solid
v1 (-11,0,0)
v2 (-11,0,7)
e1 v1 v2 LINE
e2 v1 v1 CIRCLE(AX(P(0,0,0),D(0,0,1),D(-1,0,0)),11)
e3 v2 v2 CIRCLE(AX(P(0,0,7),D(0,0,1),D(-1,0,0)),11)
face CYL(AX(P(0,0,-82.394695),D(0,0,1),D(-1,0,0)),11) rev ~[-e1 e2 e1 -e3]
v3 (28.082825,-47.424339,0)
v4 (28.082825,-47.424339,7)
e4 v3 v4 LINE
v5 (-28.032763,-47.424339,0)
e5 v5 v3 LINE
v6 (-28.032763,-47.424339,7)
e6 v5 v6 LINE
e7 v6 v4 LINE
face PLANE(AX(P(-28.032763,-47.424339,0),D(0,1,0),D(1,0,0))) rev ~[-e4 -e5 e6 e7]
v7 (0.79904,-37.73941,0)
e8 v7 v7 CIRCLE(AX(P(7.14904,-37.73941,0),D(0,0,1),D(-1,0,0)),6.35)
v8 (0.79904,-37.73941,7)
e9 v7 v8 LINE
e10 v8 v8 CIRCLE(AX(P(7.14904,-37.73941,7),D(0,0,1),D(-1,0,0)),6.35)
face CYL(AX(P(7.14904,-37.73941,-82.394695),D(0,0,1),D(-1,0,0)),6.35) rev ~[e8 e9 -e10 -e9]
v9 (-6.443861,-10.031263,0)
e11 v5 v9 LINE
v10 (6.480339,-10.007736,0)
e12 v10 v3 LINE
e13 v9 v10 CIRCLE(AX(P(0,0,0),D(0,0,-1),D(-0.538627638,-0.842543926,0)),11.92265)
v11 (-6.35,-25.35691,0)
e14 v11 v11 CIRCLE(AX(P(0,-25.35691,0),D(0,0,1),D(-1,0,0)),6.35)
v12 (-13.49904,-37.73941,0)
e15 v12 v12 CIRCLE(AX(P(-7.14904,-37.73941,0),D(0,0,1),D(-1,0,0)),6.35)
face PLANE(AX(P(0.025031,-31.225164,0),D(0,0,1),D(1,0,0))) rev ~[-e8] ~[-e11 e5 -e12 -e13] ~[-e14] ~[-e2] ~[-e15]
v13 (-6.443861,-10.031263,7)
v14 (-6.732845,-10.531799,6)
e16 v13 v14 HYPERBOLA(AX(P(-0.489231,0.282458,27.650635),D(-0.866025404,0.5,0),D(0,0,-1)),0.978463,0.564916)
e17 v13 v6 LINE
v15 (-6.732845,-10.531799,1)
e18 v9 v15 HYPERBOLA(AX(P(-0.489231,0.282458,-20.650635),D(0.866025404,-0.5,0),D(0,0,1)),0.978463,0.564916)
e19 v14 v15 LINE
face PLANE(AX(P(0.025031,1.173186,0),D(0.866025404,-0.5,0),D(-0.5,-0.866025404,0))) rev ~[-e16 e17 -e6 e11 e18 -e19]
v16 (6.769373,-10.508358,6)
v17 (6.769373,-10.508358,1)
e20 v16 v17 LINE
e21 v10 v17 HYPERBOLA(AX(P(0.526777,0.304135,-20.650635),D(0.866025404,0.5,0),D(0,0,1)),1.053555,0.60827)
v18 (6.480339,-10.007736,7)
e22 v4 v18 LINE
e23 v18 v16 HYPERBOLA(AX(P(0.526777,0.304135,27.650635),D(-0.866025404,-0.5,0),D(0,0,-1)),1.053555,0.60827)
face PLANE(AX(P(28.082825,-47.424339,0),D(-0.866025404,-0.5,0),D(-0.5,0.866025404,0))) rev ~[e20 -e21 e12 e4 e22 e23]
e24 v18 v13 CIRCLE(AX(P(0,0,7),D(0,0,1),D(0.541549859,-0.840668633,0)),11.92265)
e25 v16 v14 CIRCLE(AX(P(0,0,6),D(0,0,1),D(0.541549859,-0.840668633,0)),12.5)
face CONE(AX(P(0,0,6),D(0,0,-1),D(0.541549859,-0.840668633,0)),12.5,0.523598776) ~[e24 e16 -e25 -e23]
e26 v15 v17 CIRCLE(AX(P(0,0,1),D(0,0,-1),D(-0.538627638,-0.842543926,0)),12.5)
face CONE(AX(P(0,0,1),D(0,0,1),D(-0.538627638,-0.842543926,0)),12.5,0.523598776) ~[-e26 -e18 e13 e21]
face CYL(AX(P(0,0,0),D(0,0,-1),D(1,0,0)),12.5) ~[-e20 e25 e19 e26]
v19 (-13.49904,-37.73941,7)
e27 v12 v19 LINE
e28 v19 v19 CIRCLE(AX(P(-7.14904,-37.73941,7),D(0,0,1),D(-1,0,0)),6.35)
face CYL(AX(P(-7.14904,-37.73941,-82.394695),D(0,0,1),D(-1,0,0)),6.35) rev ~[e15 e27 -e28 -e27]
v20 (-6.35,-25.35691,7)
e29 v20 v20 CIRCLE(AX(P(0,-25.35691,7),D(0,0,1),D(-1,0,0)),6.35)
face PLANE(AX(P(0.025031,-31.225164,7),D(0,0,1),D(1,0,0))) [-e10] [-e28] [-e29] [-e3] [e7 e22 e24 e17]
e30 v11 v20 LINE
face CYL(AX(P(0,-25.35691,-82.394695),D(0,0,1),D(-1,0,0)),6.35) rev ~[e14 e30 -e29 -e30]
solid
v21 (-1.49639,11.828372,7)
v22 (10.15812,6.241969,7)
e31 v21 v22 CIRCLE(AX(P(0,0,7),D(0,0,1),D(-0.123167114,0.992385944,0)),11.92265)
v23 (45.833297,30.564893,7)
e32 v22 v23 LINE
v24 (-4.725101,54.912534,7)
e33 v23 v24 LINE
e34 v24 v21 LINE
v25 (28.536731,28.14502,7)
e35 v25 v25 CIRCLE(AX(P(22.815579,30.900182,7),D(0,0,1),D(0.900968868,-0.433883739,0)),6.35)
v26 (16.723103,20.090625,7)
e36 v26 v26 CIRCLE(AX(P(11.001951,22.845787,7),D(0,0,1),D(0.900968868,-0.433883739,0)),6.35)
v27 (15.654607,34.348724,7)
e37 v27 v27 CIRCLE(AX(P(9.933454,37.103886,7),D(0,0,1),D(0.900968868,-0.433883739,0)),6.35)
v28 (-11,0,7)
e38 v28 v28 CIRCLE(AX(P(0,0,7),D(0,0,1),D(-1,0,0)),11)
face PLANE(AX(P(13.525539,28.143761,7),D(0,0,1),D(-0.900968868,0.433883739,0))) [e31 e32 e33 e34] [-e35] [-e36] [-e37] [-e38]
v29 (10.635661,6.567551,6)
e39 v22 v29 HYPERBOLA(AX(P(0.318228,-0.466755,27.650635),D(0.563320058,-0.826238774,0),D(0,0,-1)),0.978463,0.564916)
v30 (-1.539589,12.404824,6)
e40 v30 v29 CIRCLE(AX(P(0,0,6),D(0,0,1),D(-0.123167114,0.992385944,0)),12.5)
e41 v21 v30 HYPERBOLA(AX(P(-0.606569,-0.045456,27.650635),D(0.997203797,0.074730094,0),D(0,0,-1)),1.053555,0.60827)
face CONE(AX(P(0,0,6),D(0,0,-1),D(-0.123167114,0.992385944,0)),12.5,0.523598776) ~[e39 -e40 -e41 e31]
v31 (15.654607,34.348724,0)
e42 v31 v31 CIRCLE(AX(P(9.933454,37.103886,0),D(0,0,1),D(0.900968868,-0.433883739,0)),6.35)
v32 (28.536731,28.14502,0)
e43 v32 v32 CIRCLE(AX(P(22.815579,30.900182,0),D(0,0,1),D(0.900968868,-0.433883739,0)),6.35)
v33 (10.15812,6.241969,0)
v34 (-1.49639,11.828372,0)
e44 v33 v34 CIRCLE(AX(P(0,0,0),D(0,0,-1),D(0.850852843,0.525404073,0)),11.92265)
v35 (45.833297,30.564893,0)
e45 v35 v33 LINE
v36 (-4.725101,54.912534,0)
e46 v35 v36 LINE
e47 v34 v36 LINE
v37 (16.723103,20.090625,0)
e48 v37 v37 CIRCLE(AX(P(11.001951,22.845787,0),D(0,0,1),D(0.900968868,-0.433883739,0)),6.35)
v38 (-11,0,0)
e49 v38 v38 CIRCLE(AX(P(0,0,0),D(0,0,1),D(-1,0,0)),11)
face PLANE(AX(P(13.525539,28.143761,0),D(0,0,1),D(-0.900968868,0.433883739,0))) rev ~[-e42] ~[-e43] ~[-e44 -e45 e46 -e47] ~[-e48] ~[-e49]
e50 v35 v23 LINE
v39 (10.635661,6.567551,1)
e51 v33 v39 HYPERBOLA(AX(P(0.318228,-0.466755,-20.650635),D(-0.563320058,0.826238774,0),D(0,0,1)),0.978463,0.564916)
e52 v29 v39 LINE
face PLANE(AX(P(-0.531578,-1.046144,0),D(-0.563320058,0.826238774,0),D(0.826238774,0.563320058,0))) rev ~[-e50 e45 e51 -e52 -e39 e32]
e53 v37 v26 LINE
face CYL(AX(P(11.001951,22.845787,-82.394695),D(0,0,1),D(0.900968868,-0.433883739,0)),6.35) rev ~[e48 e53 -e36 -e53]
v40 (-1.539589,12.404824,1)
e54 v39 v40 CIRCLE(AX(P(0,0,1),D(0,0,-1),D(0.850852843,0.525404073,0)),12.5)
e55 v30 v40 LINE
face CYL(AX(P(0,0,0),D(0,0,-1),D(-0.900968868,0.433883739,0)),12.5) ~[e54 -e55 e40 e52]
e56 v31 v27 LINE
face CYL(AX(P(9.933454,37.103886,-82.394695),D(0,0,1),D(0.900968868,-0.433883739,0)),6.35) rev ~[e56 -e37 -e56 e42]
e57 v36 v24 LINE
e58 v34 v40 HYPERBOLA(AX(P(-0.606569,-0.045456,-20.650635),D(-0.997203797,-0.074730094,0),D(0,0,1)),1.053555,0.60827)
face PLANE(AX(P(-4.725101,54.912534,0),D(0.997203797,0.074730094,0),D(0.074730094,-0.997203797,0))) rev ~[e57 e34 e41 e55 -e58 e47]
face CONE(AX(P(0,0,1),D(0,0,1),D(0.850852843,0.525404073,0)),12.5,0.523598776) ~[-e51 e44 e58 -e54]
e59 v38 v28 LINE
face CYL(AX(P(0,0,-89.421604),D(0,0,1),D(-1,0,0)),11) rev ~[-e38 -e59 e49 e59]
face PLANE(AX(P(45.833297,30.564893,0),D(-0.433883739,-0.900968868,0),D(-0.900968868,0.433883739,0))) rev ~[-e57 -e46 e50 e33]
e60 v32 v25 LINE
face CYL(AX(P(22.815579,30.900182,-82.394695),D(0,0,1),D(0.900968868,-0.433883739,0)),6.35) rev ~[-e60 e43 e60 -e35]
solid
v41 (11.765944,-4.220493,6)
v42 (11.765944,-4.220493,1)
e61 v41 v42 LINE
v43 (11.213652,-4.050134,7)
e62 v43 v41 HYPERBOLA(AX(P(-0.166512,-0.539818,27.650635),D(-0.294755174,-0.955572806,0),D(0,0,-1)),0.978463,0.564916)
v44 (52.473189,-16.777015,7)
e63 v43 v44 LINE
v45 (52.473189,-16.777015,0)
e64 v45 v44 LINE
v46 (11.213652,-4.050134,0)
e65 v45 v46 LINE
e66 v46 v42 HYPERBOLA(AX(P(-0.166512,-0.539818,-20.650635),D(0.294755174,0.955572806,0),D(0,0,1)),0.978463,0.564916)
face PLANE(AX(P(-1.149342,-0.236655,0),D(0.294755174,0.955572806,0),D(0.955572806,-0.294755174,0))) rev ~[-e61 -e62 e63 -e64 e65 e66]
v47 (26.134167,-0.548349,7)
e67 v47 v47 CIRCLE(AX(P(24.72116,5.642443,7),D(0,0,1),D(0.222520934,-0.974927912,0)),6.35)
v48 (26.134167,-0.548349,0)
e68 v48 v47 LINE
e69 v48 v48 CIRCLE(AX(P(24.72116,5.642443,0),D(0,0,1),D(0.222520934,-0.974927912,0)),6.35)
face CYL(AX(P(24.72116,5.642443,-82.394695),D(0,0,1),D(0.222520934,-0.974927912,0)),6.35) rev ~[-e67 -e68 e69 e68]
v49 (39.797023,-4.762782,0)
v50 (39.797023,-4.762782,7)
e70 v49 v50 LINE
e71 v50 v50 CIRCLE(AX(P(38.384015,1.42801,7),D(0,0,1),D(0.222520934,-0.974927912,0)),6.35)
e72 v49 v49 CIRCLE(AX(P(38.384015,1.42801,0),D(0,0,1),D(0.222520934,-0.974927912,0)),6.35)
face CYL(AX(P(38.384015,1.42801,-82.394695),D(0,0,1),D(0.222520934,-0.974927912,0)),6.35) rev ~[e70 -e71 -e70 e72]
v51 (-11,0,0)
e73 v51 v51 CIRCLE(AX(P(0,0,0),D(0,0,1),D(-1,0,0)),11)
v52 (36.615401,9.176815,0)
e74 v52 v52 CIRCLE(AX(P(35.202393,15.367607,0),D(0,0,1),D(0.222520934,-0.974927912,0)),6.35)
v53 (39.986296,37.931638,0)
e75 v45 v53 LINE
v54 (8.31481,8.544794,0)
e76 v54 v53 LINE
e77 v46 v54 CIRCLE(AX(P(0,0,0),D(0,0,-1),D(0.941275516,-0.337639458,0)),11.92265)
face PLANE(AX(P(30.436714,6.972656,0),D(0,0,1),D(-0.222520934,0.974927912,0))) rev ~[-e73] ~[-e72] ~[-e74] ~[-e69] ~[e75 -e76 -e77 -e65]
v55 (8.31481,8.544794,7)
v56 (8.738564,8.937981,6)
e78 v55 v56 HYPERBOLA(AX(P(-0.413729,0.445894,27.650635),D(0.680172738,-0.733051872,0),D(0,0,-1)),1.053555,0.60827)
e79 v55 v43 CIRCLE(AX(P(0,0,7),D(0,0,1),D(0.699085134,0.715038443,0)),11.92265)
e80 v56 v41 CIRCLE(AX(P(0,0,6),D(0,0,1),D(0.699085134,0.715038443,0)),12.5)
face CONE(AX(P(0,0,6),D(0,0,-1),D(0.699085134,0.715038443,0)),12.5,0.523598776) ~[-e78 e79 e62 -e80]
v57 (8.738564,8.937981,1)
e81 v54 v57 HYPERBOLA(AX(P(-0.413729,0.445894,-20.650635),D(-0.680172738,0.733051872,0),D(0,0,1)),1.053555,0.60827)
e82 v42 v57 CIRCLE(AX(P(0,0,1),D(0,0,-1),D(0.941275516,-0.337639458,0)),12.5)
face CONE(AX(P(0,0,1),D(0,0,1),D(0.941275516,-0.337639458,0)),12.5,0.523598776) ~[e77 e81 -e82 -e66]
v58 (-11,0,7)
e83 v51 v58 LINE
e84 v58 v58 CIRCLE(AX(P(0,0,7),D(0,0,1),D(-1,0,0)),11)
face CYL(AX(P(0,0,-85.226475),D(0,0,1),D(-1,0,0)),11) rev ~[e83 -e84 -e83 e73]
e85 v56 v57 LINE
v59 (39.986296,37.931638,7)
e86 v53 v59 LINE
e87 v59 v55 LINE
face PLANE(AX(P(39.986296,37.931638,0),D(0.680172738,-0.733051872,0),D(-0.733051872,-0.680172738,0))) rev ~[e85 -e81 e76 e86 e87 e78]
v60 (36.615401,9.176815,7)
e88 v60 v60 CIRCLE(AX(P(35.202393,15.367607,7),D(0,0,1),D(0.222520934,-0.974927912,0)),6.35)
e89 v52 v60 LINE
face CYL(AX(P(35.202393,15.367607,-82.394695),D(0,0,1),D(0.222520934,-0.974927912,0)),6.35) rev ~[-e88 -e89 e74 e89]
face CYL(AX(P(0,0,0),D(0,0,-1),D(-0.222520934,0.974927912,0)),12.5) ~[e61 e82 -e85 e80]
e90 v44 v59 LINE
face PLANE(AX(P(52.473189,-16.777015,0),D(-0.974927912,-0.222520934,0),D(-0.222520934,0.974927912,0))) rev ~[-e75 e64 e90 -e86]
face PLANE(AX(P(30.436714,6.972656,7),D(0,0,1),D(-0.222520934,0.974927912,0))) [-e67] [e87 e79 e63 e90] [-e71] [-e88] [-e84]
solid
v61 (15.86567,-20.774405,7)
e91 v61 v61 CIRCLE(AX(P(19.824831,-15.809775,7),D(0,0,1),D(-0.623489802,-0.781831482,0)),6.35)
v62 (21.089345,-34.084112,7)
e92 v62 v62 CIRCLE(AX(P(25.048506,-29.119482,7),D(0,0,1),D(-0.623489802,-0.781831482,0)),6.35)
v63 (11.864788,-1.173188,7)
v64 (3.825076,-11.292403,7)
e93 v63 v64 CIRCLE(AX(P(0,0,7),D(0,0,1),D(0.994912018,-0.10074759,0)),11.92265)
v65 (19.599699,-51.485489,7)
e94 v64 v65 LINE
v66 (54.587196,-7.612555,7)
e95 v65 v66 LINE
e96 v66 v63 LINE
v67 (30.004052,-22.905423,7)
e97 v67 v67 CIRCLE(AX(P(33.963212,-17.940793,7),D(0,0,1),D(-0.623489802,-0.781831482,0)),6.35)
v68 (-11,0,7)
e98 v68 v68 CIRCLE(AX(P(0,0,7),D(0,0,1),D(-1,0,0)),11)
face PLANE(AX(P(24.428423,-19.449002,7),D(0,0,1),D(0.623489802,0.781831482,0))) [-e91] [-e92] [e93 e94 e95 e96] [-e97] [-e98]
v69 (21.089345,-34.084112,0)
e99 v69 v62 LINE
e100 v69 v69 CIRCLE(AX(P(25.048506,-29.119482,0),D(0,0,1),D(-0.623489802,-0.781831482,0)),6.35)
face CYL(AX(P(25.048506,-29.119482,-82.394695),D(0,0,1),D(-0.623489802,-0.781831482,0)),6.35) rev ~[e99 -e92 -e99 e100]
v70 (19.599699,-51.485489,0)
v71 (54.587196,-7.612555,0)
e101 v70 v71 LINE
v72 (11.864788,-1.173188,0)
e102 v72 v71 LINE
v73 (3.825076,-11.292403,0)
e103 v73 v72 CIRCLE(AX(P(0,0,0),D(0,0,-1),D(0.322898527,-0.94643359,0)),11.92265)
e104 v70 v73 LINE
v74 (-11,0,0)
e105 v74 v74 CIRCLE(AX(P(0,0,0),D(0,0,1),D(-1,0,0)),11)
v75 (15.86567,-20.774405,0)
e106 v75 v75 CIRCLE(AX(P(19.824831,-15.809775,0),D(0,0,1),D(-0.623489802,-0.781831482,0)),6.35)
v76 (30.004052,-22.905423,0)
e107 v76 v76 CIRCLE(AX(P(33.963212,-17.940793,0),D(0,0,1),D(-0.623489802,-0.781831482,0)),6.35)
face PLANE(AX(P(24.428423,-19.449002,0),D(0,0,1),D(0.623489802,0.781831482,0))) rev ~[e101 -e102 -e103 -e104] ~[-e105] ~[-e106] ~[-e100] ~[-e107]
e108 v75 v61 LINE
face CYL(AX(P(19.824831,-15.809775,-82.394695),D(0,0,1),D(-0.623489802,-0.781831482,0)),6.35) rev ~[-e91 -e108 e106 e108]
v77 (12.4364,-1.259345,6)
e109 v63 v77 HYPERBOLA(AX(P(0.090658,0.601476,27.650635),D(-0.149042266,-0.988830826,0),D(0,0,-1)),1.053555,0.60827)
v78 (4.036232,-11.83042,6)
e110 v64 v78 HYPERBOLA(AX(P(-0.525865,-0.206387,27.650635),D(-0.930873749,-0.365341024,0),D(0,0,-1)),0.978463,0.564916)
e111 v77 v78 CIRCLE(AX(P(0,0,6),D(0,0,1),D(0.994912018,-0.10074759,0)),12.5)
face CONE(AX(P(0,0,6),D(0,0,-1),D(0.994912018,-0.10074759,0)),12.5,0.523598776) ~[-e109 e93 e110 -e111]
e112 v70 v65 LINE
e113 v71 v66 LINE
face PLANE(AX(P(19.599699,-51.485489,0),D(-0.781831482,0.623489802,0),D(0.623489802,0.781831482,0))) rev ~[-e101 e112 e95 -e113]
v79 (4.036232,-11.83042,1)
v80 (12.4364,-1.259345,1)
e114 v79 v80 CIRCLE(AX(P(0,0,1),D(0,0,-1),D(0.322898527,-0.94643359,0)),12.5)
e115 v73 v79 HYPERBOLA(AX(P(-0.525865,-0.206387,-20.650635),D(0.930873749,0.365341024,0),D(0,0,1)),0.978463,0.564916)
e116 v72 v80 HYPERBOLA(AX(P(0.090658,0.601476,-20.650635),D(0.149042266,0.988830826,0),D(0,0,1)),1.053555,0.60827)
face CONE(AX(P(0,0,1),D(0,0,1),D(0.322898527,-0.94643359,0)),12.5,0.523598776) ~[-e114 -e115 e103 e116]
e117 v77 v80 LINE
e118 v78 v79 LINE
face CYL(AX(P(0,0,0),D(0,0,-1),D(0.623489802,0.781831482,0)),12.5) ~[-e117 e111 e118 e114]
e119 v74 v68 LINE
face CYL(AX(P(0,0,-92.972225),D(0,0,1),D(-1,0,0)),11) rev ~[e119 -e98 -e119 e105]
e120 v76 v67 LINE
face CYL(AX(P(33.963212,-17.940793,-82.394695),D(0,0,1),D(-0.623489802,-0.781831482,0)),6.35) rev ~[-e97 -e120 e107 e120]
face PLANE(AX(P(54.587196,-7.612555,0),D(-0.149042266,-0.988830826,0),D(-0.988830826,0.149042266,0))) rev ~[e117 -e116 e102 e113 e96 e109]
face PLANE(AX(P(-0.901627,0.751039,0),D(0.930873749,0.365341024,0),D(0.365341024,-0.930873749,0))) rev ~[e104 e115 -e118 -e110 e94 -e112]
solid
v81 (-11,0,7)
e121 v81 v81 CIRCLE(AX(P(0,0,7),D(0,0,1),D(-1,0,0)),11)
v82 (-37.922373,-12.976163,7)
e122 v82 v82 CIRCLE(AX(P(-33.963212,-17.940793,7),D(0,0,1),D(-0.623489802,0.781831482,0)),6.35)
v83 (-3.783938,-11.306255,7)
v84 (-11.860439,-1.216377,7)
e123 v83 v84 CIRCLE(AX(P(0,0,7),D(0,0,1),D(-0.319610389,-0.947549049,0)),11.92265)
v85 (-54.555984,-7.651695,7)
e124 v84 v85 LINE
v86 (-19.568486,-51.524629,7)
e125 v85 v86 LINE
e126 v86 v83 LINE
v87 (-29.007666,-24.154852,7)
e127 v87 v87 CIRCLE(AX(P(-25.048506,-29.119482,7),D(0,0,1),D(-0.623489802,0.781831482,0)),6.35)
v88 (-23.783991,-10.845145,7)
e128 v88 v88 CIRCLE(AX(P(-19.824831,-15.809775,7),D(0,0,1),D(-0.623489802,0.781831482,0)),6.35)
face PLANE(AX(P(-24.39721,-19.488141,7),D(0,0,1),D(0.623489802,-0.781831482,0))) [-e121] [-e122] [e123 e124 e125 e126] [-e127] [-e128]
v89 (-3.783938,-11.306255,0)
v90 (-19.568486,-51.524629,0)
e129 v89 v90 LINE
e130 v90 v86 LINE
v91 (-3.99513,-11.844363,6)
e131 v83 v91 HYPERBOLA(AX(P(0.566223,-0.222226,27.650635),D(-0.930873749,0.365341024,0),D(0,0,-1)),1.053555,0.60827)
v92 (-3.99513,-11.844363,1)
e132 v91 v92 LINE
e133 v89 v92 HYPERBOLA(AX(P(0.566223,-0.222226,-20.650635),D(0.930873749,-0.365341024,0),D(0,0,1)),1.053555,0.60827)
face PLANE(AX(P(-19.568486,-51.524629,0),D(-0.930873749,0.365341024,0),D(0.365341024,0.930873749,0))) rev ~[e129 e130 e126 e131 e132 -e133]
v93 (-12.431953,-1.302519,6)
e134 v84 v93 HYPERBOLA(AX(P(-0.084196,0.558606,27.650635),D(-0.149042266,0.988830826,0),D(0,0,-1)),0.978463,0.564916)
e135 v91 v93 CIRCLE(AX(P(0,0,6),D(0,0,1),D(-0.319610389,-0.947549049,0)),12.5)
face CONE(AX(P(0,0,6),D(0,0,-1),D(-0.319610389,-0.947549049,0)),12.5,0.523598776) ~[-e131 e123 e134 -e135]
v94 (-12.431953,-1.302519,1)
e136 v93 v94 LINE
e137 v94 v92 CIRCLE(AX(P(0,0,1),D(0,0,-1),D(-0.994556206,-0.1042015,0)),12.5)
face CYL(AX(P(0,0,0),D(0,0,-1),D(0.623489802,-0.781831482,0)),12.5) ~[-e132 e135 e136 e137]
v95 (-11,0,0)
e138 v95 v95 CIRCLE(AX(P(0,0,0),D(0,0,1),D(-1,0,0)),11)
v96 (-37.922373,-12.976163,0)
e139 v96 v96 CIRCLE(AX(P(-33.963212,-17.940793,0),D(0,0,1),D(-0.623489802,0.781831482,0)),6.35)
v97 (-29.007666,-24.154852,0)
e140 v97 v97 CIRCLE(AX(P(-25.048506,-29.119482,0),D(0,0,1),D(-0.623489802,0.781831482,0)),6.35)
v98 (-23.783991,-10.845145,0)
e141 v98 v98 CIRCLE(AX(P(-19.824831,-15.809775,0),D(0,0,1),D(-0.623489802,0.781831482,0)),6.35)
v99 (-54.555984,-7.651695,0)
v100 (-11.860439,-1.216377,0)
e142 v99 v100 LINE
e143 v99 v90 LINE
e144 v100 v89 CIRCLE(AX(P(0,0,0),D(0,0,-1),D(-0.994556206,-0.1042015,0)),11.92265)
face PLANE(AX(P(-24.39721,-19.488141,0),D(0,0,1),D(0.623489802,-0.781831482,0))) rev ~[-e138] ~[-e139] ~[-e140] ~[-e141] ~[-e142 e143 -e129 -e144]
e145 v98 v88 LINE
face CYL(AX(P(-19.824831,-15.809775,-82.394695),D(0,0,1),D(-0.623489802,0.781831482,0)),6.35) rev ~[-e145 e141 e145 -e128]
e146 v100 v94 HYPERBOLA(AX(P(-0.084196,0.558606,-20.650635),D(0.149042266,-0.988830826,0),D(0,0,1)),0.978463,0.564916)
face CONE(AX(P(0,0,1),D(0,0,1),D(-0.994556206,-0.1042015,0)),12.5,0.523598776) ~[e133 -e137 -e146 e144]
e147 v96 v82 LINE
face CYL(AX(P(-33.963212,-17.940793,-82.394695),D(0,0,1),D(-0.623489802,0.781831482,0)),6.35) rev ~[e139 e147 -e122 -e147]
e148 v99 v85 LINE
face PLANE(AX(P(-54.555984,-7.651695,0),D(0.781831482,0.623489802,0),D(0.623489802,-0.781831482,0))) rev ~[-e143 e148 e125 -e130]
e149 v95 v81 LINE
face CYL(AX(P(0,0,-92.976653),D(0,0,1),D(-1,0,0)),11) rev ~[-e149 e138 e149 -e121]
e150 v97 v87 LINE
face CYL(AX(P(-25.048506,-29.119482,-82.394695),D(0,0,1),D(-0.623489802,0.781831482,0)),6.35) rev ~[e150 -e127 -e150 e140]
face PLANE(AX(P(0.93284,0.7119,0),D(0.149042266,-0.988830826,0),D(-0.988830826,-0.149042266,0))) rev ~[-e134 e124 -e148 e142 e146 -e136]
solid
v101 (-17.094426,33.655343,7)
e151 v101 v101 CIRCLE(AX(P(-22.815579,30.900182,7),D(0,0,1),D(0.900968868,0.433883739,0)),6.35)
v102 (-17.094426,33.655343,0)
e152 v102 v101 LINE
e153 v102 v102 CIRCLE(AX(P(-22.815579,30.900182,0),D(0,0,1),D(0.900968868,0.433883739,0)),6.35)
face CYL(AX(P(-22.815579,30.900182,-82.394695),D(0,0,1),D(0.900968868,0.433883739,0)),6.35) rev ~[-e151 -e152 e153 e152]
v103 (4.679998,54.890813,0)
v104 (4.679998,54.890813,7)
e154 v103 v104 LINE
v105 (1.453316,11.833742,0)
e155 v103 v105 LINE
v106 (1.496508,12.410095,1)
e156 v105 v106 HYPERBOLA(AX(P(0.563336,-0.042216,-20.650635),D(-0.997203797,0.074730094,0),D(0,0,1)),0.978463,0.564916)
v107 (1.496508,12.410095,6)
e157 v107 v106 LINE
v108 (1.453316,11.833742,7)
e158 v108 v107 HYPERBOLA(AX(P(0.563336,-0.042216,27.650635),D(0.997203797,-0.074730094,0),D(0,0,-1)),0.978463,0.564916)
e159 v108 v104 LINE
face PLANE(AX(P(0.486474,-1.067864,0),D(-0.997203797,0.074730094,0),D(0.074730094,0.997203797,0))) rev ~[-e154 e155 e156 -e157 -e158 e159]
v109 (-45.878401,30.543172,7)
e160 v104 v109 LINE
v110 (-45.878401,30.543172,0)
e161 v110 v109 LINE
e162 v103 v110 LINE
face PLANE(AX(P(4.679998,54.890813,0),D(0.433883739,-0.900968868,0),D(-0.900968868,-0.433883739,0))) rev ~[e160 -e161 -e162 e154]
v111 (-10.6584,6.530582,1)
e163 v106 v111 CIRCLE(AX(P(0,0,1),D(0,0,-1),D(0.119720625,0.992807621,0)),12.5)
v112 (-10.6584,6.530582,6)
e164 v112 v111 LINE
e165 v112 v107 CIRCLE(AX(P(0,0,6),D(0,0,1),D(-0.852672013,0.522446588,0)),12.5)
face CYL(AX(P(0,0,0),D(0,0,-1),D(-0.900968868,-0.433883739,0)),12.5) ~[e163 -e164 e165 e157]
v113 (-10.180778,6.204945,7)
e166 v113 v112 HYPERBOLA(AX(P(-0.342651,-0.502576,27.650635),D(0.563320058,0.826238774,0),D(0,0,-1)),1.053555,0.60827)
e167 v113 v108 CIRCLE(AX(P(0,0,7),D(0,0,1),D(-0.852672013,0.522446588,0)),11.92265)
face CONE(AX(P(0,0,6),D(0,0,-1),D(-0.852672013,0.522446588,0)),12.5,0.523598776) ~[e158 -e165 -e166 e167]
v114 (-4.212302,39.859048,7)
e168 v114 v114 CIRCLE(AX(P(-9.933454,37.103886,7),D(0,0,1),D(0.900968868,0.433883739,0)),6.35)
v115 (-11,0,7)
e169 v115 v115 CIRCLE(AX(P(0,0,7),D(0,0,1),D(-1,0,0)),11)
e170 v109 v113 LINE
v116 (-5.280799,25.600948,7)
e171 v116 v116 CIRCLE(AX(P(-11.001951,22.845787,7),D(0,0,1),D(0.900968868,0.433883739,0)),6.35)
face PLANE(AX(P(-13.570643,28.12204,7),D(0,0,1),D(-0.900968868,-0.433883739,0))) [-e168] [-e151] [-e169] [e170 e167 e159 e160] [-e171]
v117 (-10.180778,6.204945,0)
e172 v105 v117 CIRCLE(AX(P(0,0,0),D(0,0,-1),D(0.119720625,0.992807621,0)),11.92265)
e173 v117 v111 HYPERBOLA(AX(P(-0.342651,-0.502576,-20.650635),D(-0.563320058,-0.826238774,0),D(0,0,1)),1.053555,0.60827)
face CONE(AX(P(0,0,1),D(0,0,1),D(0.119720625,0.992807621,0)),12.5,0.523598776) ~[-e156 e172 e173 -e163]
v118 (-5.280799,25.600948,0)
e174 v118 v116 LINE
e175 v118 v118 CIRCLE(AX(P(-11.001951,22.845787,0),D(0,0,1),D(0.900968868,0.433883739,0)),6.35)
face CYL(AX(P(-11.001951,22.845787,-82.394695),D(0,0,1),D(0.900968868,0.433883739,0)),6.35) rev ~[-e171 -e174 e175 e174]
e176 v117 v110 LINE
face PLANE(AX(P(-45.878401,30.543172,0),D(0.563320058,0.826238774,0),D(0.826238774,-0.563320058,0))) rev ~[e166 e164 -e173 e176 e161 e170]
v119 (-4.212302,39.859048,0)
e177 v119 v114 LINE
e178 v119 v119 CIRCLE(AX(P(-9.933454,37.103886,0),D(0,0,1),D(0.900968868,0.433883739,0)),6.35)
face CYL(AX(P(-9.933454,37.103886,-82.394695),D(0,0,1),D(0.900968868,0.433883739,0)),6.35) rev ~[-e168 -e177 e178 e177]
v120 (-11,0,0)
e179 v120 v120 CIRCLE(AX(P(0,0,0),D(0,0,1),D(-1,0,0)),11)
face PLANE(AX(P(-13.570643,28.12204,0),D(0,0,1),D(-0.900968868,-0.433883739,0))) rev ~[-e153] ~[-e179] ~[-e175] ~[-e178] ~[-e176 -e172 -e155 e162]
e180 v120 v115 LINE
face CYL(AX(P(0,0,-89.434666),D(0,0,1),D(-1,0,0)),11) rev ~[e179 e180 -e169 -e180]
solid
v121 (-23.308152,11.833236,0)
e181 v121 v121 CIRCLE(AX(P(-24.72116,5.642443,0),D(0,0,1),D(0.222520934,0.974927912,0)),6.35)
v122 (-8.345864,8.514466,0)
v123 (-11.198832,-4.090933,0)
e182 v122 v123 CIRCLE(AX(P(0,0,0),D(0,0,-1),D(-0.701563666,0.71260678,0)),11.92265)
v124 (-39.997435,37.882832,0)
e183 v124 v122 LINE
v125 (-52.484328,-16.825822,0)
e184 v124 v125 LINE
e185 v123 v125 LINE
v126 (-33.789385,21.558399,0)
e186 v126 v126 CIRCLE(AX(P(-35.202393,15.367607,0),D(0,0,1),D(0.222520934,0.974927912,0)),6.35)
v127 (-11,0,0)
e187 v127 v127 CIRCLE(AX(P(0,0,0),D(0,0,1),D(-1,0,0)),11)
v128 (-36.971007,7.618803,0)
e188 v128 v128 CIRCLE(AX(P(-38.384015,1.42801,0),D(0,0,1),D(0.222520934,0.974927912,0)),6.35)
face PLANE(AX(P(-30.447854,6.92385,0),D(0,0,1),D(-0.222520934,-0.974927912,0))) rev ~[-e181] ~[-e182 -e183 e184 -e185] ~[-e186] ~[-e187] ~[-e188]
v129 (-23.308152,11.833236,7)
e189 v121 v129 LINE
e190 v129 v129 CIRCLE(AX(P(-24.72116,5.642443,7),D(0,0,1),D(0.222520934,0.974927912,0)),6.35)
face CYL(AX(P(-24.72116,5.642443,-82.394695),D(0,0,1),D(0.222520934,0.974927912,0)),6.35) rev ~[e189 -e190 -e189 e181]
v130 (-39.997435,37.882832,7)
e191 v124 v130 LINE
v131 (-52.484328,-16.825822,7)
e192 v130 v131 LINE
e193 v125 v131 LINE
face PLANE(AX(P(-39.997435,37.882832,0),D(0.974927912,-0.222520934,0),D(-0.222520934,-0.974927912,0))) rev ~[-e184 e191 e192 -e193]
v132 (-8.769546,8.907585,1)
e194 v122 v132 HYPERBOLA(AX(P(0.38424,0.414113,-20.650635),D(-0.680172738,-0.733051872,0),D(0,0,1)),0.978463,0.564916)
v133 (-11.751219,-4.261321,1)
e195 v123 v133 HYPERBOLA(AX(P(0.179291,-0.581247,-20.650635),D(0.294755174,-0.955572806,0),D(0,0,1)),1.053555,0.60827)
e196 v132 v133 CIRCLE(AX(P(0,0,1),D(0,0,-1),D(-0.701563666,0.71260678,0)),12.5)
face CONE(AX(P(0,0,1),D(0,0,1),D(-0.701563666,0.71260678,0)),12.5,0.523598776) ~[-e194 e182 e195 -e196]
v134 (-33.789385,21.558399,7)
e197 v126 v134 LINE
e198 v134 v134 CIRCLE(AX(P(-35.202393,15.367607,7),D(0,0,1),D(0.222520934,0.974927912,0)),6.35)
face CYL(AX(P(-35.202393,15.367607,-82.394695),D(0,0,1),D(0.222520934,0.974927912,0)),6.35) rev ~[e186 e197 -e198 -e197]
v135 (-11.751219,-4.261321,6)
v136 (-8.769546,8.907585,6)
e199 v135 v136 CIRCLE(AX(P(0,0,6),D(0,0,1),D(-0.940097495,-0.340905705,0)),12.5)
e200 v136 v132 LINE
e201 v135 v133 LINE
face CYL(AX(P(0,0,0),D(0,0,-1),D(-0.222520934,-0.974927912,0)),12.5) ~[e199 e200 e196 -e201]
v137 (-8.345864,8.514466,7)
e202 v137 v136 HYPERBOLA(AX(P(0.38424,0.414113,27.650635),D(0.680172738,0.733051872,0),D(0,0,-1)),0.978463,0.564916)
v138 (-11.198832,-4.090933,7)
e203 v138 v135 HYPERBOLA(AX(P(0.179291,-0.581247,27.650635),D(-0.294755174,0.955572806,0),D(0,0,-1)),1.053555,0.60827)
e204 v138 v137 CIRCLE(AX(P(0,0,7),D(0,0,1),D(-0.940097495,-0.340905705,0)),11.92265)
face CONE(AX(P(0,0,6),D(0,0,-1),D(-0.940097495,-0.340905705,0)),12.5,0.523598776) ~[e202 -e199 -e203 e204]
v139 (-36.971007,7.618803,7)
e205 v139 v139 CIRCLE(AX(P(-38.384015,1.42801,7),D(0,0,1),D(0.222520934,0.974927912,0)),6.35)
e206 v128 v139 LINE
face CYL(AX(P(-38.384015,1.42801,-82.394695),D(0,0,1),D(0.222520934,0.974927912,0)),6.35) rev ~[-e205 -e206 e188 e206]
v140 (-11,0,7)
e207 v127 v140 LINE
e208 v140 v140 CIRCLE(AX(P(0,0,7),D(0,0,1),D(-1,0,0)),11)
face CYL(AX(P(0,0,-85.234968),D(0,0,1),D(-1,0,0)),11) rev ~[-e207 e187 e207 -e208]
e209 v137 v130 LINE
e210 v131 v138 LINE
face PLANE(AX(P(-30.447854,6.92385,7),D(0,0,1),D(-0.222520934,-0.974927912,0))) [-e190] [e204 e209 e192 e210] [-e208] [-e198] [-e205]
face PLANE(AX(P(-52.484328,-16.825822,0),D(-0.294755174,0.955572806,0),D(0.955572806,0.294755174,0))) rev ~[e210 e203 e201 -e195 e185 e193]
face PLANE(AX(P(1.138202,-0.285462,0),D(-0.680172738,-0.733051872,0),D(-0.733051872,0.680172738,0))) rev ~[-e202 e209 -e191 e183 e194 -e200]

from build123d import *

# Parameters (mm, degrees)
F0_R     = 12.5
F1_DEPTH = 7
F3_DEPTH = 7
F4_SIZE2 = 1
F4_SIZE  = 0.5773502692
F5_SIZE2 = 1
F5_SIZE  = 0.5773502692
F7_D     = 12.7
F8_COUNT = 7
F10_D    = 22
F10_2_D  = 22
F10_3_D  = 22
F10_4_D  = 22
F10_5_D  = 22
F10_6_D  = 22
F10_7_D  = 22


# Not quite as in the source:
# - a feature names something its author has since deleted; it is built from what else it names


with BuildPart() as f1:
    # F0 (on Top) → F1 (new body)
    with BuildSketch(Plane.XY):
        Circle(F0_R)
    extrude(amount=F1_DEPTH)

    # F2 (on Top) + F0 (on Top) → F3 (join)
    with BuildSketch(Plane.XY):
        Polygon((-28.0327634543, -47.4243392048), (28.0828249826, -47.4243392048), (0.0250307641, 1.1731859299), align=None)
    with BuildSketch(Plane.XY):
        Circle(F0_R)
    extrude(amount=F3_DEPTH)

    # F4
    f4_edges = [f1.edges().sort_by_distance(p)[0] for p in [
        (-0.021701, 12.499981, 7),
    ]]
    f4_side = f1.faces().sort_by_distance((0.018297, -23.813654, 7))[0]
    chamfer(f4_edges, length=F4_SIZE, length2=F4_SIZE2, reference=f4_side)

    # F5
    f5_edges = [f1.edges().sort_by_distance(p)[0] for p in [
        (-0.021701, 12.499981, 0),
    ]]
    f5_side = f1.faces().sort_by_distance((0.018297, -23.813654, 0))[0]
    chamfer(f5_edges, length=F5_SIZE, length2=F5_SIZE2, reference=f5_side)

    # F7 (through all)
    with Locations(Plane(origin=(0, 0, 0), x_dir=(1, 0, 0), z_dir=(0, 0, -1))):
        with Locations((0, 25.3569102192), (7.1490397082, 37.7394102192), (-7.1490397082, 37.7394102192)):
            Hole(F7_D / 2)


with BuildPart() as f8_1:
    # F8: instance of F1
    add(f1.part.rotate(Axis((0, 0, 0), (0, 0, -1)), 1 * 360 / F8_COUNT))

    # F10#2 (through all)
    with Locations(Plane(origin=(0, 0, 0), x_dir=(1, 0, 0), z_dir=(0, 0, -1))):
        with Locations((0, 0)):
            Hole(F10_2_D / 2)


with BuildPart() as f8_2:
    # F8: instance of F1
    add(f1.part.rotate(Axis((0, 0, 0), (0, 0, -1)), 2 * 360 / F8_COUNT))

    # F10#3 (through all)
    with Locations(Plane(origin=(0, 0, 0), x_dir=(1, 0, 0), z_dir=(0, 0, -1))):
        with Locations((0, 0)):
            Hole(F10_3_D / 2)


with BuildPart() as f8_3:
    # F8: instance of F1
    add(f1.part.rotate(Axis((0, 0, 0), (0, 0, -1)), 3 * 360 / F8_COUNT))

    # F10#4 (through all)
    with Locations(Plane(origin=(0, 0, 0), x_dir=(1, 0, 0), z_dir=(0, 0, -1))):
        with Locations((0, 0)):
            Hole(F10_4_D / 2)


with BuildPart() as f8_4:
    # F8: instance of F1
    add(f1.part.rotate(Axis((0, 0, 0), (0, 0, -1)), 4 * 360 / F8_COUNT))

    # F10#5 (through all)
    with Locations(Plane(origin=(0, 0, 0), x_dir=(1, 0, 0), z_dir=(0, 0, -1))):
        with Locations((0, 0)):
            Hole(F10_5_D / 2)


with BuildPart() as f8_5:
    # F8: instance of F1
    add(f1.part.rotate(Axis((0, 0, 0), (0, 0, -1)), 5 * 360 / F8_COUNT))

    # F10#6 (through all)
    with Locations(Plane(origin=(0, 0, 0), x_dir=(1, 0, 0), z_dir=(0, 0, -1))):
        with Locations((0, 0)):
            Hole(F10_6_D / 2)


with BuildPart() as f8_6:
    # F8: instance of F1
    add(f1.part.rotate(Axis((0, 0, 0), (0, 0, -1)), 6 * 360 / F8_COUNT))

    # F10#7 (through all)
    with Locations(Plane(origin=(0, 0, 0), x_dir=(1, 0, 0), z_dir=(0, 0, -1))):
        with Locations((0, 0)):
            Hole(F10_7_D / 2)


with BuildPart() as f1_1:
    add(f1.part)

    # F10 (through all)
    with Locations(Plane(origin=(0, 0, 0), x_dir=(1, 0, 0), z_dir=(0, 0, -1))):
        with Locations((0, 0)):
            Hole(F10_D / 2)


solid = Compound([f8_1.part, f8_2.part, f8_3.part, f8_4.part, f8_5.part, f8_6.part, f1_1.part])
